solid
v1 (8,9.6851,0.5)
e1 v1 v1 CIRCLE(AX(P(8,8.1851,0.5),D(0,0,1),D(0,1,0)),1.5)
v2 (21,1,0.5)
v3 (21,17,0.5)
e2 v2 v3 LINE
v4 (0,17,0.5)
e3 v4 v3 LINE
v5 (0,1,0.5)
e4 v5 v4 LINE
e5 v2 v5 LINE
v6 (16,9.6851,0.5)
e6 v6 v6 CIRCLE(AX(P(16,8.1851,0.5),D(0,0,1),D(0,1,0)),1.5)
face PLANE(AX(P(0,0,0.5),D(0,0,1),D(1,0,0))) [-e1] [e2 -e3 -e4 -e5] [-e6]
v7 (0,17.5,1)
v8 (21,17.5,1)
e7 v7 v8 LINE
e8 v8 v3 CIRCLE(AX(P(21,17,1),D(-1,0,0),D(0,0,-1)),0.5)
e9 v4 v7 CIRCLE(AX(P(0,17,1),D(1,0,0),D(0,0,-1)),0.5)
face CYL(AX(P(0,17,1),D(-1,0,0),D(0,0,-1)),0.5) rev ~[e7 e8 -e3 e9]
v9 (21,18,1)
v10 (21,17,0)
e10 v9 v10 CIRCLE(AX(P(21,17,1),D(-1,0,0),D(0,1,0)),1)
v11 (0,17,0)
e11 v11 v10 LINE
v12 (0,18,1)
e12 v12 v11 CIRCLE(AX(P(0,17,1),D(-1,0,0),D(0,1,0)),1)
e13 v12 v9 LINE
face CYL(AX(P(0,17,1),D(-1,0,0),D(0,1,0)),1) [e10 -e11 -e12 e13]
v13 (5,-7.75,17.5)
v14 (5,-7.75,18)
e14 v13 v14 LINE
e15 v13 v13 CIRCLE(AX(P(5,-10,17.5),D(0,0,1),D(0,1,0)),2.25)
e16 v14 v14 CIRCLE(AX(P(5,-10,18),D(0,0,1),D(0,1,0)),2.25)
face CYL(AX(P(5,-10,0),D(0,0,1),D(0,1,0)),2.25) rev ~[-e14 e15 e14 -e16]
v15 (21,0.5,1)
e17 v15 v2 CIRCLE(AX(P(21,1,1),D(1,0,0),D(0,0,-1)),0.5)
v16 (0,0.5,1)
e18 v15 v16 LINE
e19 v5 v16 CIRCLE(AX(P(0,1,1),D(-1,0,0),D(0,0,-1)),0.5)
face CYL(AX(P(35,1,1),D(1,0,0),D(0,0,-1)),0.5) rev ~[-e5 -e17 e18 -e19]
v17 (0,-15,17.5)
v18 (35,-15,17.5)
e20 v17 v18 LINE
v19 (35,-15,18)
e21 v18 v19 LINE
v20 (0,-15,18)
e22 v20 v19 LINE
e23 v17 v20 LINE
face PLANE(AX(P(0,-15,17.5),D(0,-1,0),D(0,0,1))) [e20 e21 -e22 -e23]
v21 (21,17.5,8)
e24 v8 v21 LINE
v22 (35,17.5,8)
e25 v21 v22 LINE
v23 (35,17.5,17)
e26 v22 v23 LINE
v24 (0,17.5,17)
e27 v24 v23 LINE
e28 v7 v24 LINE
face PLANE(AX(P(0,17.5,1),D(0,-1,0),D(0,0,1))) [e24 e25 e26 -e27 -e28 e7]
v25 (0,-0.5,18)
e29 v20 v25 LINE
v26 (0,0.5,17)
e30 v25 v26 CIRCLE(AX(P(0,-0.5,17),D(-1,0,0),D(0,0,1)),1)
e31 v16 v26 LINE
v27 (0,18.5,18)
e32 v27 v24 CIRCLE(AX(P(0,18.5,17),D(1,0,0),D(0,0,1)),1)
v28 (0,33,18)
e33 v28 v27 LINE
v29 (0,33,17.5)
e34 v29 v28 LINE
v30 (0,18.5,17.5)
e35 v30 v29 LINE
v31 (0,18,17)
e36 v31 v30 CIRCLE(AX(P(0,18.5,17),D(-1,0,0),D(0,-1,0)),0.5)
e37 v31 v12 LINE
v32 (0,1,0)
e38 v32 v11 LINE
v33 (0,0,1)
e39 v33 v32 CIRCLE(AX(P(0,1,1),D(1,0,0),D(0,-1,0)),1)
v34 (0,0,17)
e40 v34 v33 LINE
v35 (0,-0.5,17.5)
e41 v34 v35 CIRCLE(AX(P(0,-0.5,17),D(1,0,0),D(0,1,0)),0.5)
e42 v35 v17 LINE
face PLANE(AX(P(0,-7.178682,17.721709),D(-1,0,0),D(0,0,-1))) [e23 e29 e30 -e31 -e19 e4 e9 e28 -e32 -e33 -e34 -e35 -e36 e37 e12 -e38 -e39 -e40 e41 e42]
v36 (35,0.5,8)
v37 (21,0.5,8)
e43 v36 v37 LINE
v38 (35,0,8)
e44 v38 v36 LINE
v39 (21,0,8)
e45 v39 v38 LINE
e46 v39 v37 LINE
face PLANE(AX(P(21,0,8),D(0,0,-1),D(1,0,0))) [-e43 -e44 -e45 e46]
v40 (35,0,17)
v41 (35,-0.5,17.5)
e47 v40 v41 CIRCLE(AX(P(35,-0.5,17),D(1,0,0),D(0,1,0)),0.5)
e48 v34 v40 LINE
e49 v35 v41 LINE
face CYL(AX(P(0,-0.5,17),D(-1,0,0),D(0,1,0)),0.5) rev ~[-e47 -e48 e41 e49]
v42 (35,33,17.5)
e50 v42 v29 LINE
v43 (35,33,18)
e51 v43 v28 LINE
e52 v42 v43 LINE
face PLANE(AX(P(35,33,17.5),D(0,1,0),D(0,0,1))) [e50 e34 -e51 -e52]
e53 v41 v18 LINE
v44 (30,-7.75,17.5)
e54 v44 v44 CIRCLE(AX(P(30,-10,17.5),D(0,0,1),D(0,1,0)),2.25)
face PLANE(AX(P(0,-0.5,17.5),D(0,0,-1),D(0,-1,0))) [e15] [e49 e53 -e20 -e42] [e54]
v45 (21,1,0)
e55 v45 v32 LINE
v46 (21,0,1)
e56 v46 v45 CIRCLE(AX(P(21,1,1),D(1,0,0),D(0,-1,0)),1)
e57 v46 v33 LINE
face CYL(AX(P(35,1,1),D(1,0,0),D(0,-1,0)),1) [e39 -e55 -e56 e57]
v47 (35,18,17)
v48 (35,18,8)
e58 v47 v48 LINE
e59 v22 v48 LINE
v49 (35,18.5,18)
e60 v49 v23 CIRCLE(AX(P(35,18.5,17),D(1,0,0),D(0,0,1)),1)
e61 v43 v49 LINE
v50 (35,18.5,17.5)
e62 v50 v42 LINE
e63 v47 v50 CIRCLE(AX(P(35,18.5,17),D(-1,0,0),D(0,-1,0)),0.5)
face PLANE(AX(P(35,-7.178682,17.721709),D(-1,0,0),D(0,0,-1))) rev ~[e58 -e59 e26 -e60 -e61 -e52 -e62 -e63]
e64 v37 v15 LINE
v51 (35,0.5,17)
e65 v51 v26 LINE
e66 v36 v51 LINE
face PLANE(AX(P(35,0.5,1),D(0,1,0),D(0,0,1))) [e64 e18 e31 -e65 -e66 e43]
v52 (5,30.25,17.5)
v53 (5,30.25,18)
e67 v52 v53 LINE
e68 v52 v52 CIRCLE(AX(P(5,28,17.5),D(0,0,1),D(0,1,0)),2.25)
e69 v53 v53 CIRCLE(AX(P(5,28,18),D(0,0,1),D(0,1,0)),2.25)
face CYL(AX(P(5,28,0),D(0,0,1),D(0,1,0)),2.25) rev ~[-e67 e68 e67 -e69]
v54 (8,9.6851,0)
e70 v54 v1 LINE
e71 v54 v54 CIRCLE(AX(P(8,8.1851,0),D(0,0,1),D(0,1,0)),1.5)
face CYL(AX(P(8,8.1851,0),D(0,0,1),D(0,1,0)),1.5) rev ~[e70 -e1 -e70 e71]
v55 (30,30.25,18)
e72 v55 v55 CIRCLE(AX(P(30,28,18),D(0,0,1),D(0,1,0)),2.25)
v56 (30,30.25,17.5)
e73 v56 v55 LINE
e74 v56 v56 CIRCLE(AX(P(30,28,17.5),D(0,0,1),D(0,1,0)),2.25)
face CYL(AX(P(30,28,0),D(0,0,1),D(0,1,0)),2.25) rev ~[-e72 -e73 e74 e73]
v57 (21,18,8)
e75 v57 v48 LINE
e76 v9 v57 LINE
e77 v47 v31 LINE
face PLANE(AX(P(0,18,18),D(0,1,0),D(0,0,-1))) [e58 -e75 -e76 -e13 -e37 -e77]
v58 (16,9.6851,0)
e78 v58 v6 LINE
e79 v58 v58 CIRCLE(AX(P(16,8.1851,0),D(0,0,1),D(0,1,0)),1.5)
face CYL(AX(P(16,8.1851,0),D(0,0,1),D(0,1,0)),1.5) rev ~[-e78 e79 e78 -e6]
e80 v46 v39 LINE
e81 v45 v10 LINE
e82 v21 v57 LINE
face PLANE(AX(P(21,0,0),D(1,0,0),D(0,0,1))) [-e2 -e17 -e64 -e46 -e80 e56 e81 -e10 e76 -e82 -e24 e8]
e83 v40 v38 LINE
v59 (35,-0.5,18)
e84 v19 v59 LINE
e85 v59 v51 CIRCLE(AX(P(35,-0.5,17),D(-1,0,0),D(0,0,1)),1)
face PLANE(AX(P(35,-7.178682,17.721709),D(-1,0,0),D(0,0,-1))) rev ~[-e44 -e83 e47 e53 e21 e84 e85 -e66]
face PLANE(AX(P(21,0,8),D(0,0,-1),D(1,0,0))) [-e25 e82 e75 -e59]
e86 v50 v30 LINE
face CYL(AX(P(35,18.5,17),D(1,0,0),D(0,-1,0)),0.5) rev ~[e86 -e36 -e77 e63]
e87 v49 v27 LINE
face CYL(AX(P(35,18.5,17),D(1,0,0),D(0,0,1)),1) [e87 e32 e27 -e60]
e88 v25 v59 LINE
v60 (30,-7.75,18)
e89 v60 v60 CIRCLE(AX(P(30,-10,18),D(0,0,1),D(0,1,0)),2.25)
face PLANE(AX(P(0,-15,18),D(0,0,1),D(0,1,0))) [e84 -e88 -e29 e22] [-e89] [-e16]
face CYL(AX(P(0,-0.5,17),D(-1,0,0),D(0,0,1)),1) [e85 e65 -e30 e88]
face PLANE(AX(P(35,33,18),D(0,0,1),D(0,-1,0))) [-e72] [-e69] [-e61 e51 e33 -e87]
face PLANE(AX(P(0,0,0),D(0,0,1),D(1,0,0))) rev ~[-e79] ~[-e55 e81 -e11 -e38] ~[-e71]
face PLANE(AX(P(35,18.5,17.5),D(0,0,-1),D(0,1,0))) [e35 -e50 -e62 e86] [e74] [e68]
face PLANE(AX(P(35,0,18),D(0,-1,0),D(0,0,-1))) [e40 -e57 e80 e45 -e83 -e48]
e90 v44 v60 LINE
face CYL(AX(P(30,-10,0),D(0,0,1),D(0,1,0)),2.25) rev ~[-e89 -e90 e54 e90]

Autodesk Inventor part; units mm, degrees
ref_plane "YZ Plane" through (0, 0, 0) normal (1, 0, 0) x (0, 1, 0)
ref_plane "XZ Plane" through (0, 0, 0) normal (0, 1, 0) x (-1, 0, 0)
ref_plane "XY Plane" through (0, 0, 0) normal (0, 0, 1) x (1, 0, 0)
sketch "Skizze2" plane through (0, 0, 0) normal (0, 0, 1) x (1, 0, 0)
  line L0 (0, 18) -> (35, 18)
  line L1 (35, 18) -> (35, 0)
  line L2 (35, 0) -> (0, 0)
  line L3 (0, 0) -> (0, 18)
  dimension "d12" = 18
  dimension "d13" = 35
extrude "Grobblech2" add sketch "Skizze2" along normal blind 0.5
sketch "Skizze3" plane through (0, 17.5, 0) normal (0, 1, 0) x (-1, 0, 0)
  line L0 (-35, 0) -> (0, 0)
  line L1 (0, 0) -> (0, 18)
  line L2 (0, 18) -> (-35, 18)
  line L3 (-35, 18) -> (-35, 0)
edge flange "Lasche1" height 18 angle 90 thickness 0.5 bend radius 0.5 thickness toward (0, 1, 0) relief tear relief width 0.5 relief depth 0.25 edges at (17.5, 18, 0.5) wall of the first edge with corners at (35, 17.5, 0) (0, 17.5, 0) (0, 17.5, 18) (35, 17.5, 18)
bend "Biegung1"
corner "Ecke1"
sketch "Skizze4" plane through (35, 0.5, 0) normal (0, -1, 0) x (1, 0, 0)
  line L0 (-35, 0) -> (0, 0)
  line L1 (0, 0) -> (0, 18)
  line L2 (0, 18) -> (-35, 18)
  line L3 (-35, 18) -> (-35, 0)
edge flange "Lasche2" height 18 angle 90 thickness 0.5 bend radius 0.5 thickness toward (0, -1, 0) relief tear relief width 0.5 relief depth 0.25 edges at (17.5, 0, 0.5) wall of the first edge with corners at (0, 0.5, 0) (35, 0.5, 0) (35, 0.5, 18) (0, 0.5, 18)
bend "Biegung2"
corner "Ecke2"
sketch "Skizze5" plane through (35, 17.5, 17.5) normal (0, 0, 1) x (1, 0, 0)
  line L0 (-35, 0) -> (0, 0)
  line L1 (0, 0) -> (0, 15.5)
  line L2 (0, 15.5) -> (-35, 15.5)
  line L3 (-35, 15.5) -> (-35, 0)
edge flange "Lasche3" height 15.5 angle 90 thickness 0.5 bend radius 0.5 thickness toward (0, 0, 1) relief tear relief width 0.5 relief depth 0.25 edges at (17.5, 18, 18) wall of the first edge with corners at (0, 17.5, 17.5) (35, 17.5, 17.5) (35, 33, 17.5) (0, 33, 17.5)
bend "Biegung3"
corner "Ecke3"
sketch "Skizze6" plane through (0, 0.5, 17.5) normal (0, 0, 1) x (1, 0, 0)
  line L0 (35, 0) -> (0, 0)
  line L1 (0, 0) -> (0, -15.5)
  line L2 (0, -15.5) -> (35, -15.5)
  line L3 (35, -15.5) -> (35, 0)
edge flange "Lasche4" height 15.5 angle 90 thickness 0.5 bend radius 0.5 thickness toward (0, 0, 1) relief tear relief width 0.5 relief depth 0.25 edges at (17.5, 0, 18) wall of the first edge with corners at (35, 0.5, 17.5) (0, 0.5, 17.5) (0, -15, 17.5) (35, -15, 17.5)
bend "Biegung4"
corner "Ecke4"
sketch "Skizze7" plane through (0, 0, 1) normal (0, -1, 0) x (1, 0, 0)
  line L0 (35, -1) -> (21, -1)
  line L1 (21, -1) -> (21, 7)
  line L2 (21, 7) -> (35, 7)
  line L3 (35, 7) -> (35, -1)
  line L4 (35, -1) -> (0, -1) projected
  dimension "d55" = 8
  dimension "d56" = 14
extrude "Ausschneiden1" cut sketch "Skizze7" against normal up to surface (18 mm away)
sketch "Skizze8" plane through (0, 0, 0) normal (0, 0, -1) x (-1, 0, 0)
  line L0 (-21, 17) -> (-21, 1) projected
  line L1 (-21, 1) -> (0, 1) projected
  line L2 (0, 17) -> (0, 1) projected
  line L3 (0, 17) -> (-21, 17) projected
  line L4 (0, 9) -> (-30.5159, 9) construction
  line L5 (-35, -15) -> (0, -15) projected
  line L6 (-17.5, -15) -> (-17.5, 33) construction
  line L7 (0, 33) -> (-35, 33) projected
  point P0 (0, 0)
  point P1 (-30, 28)
  point P2 (-5, 28)
  point P3 (-30, -10)
  point P4 (-5, -10)
  dimension "d59" = 25
  dimension "d60" = 38
  dimension "d61" = 25
  dimension "d62" = 38
hole "Bohrung1" at (30, 28, 0) at (5, 28, 0) at (30, -10, 0) at (5, -10, 0) direction (0, 0, 1) diameter 4.5 depth 18
sketch "Skizze9" plane through (0, 0, 0) normal (0, 0, -1) x (-1, 0, 0)
  line L0 (0, 17) -> (0, 1) projected
  point P0 (0, 0)
  point P1 (-8, 8.1851)
  point P2 (-16, 8.1851)
  dimension "d70" = 8
  dimension "d71" = 8
hole "Bohrung2" at (8, 8.1851, 0) at (16, 8.1851, 0) direction (0, 0, 1) diameter 3 end through all
equation "\"d57\" = Stärke"
equation "\"d68\" = Stärke"
equation "\"d14\" = Stärke"
equation "\"d15\" = BreiteBiegungsfreistellung"
equation "\"d16\" = TiefeBiegungsfreistellung"
equation "\"d17\" = MinimalRest"
equation "\"d18\" = Übergangsradius"
equation "\"d21\" = Biegeradius"
equation "\"d22\" = GrößeEckenfreistellung"
equation "\"d23\" = Abstandsgröße"
equation "\"d24\" = JacobiRadiusGröße"
equation "\"d25\" = BreiteBiegungsfreistellung"
equation "\"d26\" = TiefeBiegungsfreistellung"
equation "\"d27\" = MinimalRest"
equation "\"d28\" = Übergangsradius"
equation "\"d31\" = Biegeradius"
equation "\"d32\" = GrößeEckenfreistellung"
equation "\"d33\" = Abstandsgröße"
equation "\"d34\" = JacobiRadiusGröße"
equation "\"d35\" = BreiteBiegungsfreistellung"
equation "\"d36\" = TiefeBiegungsfreistellung"
equation "\"d37\" = MinimalRest"
equation "\"d38\" = Übergangsradius"
equation "\"d41\" = Biegeradius"
equation "\"d42\" = GrößeEckenfreistellung"
equation "\"d43\" = Abstandsgröße"
equation "\"d44\" = JacobiRadiusGröße"
equation "\"d45\" = BreiteBiegungsfreistellung"
equation "\"d46\" = TiefeBiegungsfreistellung"
equation "\"d47\" = MinimalRest"
equation "\"d48\" = Übergangsradius"
equation "\"d51\" = Biegeradius"
equation "\"d52\" = GrößeEckenfreistellung"
equation "\"d53\" = Abstandsgröße"
equation "\"d54\" = JacobiRadiusGröße"
equation "\"Biegeradius\" = Stärke"
equation "\"BreiteBiegungsfreistellung\" = Stärke"
equation "\"TiefeBiegungsfreistellung\" = 0.5 * Stärke"
equation "\"GrößeEckenfreistellung\" = 4 * Stärke"
equation "\"MinimalRest\" = 2 * Stärke"
equation "\"Übergangsradius\" = Biegeradius"
equation "\"JacobiRadiusGröße\" = Biegeradius"
equation "\"Abstandsgröße\" = Stärke"
equation "\"Stärke\" = 0.5"
properties part number "Bügelbefestigung" material "Stahl, galvanisiert"
